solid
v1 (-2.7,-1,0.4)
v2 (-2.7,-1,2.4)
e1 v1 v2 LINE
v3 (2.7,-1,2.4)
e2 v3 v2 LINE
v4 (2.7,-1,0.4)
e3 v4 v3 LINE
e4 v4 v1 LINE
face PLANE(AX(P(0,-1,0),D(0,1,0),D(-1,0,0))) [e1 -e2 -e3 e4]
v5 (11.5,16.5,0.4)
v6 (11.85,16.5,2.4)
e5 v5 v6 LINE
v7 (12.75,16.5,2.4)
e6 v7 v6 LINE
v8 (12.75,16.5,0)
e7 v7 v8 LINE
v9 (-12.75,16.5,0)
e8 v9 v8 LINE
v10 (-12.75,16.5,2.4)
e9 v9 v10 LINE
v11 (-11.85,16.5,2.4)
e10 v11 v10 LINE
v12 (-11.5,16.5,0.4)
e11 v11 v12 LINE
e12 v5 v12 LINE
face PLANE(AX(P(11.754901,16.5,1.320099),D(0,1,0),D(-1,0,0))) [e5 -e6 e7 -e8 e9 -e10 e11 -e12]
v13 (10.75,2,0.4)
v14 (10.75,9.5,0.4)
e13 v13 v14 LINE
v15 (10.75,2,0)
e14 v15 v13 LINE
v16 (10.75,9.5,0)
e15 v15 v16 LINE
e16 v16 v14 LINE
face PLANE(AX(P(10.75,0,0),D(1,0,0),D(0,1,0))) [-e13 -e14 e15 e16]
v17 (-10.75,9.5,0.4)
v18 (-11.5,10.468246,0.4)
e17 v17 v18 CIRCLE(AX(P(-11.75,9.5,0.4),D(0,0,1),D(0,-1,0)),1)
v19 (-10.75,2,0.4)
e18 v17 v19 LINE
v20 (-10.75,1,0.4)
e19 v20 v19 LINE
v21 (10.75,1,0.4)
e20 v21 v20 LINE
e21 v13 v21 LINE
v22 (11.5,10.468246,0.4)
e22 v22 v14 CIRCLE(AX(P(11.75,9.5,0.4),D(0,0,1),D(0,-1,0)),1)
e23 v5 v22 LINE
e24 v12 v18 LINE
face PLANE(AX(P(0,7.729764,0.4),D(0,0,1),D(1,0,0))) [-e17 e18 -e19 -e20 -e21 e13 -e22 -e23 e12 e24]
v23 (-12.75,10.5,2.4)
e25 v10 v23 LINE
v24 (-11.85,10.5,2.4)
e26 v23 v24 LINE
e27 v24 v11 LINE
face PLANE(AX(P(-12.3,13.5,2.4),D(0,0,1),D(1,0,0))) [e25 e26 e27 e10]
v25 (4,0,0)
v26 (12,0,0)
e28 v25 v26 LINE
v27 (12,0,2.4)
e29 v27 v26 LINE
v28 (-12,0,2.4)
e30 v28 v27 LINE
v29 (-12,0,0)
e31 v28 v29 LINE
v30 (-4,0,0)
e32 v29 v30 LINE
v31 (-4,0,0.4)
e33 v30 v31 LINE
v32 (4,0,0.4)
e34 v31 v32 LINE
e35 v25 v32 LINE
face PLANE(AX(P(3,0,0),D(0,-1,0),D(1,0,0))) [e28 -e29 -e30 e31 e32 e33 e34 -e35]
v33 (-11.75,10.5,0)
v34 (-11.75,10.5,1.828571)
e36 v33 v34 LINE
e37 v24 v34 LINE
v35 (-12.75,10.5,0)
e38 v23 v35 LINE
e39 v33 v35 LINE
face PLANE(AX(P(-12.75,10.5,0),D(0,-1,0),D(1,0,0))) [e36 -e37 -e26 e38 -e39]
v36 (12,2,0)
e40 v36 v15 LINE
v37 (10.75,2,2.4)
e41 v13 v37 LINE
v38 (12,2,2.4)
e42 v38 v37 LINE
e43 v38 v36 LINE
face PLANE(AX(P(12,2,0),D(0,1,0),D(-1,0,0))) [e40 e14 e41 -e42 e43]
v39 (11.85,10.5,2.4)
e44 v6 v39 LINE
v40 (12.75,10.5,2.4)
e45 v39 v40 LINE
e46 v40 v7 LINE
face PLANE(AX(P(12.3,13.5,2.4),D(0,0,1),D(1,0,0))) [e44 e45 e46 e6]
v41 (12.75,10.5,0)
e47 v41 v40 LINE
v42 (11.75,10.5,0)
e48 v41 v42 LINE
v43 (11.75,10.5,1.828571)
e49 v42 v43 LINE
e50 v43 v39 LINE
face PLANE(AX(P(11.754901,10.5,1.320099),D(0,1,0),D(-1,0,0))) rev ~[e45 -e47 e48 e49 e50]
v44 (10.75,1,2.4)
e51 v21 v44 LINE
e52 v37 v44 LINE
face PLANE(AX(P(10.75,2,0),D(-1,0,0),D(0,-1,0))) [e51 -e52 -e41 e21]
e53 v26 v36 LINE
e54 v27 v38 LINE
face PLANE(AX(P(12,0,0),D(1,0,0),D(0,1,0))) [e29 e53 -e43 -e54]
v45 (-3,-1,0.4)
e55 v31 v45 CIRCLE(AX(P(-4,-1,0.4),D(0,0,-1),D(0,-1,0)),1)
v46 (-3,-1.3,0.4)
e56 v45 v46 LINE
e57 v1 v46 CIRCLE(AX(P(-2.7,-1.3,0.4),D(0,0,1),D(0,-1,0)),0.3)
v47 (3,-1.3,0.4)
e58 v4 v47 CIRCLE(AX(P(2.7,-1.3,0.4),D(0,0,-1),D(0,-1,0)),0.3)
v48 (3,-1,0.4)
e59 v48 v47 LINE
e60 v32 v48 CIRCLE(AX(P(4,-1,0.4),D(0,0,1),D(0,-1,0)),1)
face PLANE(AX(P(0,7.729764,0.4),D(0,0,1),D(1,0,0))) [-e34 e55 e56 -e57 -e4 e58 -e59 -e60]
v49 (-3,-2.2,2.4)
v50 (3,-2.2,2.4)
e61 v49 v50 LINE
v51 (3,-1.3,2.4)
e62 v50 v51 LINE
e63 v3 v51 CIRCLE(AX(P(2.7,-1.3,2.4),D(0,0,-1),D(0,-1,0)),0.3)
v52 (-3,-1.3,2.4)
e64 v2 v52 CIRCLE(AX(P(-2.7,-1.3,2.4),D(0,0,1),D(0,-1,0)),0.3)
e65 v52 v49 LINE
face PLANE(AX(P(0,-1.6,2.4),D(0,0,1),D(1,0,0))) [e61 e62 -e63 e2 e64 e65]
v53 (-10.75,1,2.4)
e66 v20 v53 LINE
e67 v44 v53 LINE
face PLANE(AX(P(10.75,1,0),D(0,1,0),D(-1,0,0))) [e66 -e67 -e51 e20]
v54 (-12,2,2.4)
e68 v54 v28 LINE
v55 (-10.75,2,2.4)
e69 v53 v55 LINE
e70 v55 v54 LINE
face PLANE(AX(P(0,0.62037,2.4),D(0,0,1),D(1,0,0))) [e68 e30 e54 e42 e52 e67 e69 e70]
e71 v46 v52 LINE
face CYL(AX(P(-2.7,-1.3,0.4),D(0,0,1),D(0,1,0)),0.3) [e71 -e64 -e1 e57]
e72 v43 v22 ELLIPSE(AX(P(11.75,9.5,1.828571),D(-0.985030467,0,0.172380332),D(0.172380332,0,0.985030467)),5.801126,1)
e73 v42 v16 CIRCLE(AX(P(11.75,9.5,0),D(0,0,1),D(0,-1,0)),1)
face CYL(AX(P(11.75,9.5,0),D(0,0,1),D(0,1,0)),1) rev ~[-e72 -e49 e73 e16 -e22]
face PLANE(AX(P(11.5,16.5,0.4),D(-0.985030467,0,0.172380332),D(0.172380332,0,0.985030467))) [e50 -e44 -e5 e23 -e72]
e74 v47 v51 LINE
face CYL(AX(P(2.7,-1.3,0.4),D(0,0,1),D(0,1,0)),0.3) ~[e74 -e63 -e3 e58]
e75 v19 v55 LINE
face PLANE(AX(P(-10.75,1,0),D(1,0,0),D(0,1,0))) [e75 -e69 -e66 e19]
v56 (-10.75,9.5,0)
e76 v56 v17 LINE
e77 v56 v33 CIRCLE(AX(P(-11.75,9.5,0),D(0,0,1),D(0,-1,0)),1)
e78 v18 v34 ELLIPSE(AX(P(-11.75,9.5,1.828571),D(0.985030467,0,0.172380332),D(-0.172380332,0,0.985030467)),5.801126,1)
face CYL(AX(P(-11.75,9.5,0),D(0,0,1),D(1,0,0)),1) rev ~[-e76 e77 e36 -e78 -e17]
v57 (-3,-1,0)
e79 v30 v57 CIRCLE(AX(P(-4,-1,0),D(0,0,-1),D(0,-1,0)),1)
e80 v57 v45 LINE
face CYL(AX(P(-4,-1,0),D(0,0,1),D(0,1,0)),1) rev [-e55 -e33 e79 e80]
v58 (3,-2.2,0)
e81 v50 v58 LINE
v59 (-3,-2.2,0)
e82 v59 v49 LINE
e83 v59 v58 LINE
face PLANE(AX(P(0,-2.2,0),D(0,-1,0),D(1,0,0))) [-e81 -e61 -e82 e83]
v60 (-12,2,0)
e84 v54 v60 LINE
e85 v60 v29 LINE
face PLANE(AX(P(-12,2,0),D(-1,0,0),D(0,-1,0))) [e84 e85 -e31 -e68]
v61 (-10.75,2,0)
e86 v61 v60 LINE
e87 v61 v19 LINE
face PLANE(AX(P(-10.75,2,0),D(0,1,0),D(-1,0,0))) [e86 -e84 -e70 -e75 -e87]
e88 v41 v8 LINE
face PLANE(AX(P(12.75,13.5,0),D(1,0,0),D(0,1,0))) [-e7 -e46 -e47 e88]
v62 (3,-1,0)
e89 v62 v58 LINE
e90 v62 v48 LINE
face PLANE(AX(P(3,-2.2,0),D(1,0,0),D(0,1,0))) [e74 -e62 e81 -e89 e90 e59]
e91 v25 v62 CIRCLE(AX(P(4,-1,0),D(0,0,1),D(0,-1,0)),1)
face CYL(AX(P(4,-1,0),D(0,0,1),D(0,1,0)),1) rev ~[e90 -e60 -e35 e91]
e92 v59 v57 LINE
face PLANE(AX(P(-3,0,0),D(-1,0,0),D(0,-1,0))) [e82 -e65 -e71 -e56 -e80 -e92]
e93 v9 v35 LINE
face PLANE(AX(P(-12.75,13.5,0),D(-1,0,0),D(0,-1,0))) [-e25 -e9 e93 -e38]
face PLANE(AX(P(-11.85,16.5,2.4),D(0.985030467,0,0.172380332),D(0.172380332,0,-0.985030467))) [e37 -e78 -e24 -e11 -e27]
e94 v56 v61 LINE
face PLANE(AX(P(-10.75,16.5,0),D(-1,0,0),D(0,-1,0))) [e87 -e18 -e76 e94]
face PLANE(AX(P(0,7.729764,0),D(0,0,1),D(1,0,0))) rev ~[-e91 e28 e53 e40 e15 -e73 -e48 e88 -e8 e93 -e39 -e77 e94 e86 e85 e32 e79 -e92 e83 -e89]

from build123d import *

# Parameters (mm, degrees)
F0_W     = 6
F0_H     = 1
F0_H_2   = 1.2
F0_W_2   = 1.1
F0_H_3   = 6
F0_W_3   = 0.9
F5_DEPTH = 6
F6_R     = 1
F7_R     = 0.3


with BuildPart() as f2:
    # F2: sweep along a path in F1
    with BuildLine(Plane.XZ) as f2_path:
        Line((0, 0), (0, 0.4))
    # F0 (on Top) → F2 (sweep)
    with BuildSketch(Plane.XY):
        Polygon((-10.75, 1), (-10.75, 0), (-3, 0), (3, 0), (10.75, 0), (10.75, 1), align=None)
        Polygon((-12, 0), (-10.75, 0), (-10.75, 1), (-10.75, 2), (-12, 2), align=None)
        with Locations((0, -0.5)):
            Rectangle(F0_W, F0_H)
        Polygon((-10.75, 2), (-10.75, 1), (10.75, 1), (10.75, 2), (10.75, 10.5), (10.75, 16.5), (-10.75, 16.5), (-10.75, 10.5), align=None)
        with Locations((0, -1.6)):
            Rectangle(F0_W, F0_H_2)
        Polygon((10.75, 2), (10.75, 1), (10.75, 0), (12, 0), (12, 2), align=None)
        with Locations((-11.3, 13.5)):
            Rectangle(F0_W_2, F0_H_3)
        with Locations((-12.3, 13.5)):
            Rectangle(F0_W_3, F0_H_3)
        with Locations((11.3, 13.5)):
            Rectangle(F0_W_2, F0_H_3)
        with Locations((12.3, 13.5)):
            Rectangle(F0_W_3, F0_H_3)
    sweep(path=f2_path.line)

    # F3: sweep along a path in F1
    with BuildLine(Plane.XZ) as f3_path:
        Line((0, 0), (0, 0.4))
        Line((0, 0.4), (0, 2.4))
    # F0 (on Top) → F3 (sweep)
    with BuildSketch(Plane.XY):
        Polygon((-10.75, 1), (-10.75, 0), (-3, 0), (3, 0), (10.75, 0), (10.75, 1), align=None)
        Polygon((-12, 0), (-10.75, 0), (-10.75, 1), (-10.75, 2), (-12, 2), align=None)
        Polygon((10.75, 2), (10.75, 1), (10.75, 0), (12, 0), (12, 2), align=None)
        with Locations((12.3, 13.5)):
            Rectangle(F0_W_3, F0_H_3)
        with Locations((-12.3, 13.5)):
            Rectangle(F0_W_3, F0_H_3)
        with Locations((0, -1.6)):
            Rectangle(F0_W, F0_H_2)
    sweep(path=f3_path.line)

    # F4 (on face) → F5 (join, through all)
    with BuildSketch(Plane(origin=(0, 16.5, 0), x_dir=(-1, 0, 0), z_dir=(0, 1, 0))):
        Polygon((-11.5, 0.4), (-11.85, 2.4), (-11.85, 0.4), align=None)
        Polygon((11.85, 2.4), (11.5, 0.4), (11.85, 0.4), align=None)
    extrude(amount=-F5_DEPTH)

    # F6
    f6_edges = [f2.edges().sort_by_distance(p)[0] for p in [
        (-10.75, 10.5, 0.2),
        (10.75, 10.5, 0.2),
        (3, 0, 0.2),
        (-3, 0, 0.2),
    ]]
    fillet(f6_edges, radius=F6_R)

    # F7
    f7_edges = [f2.edges().sort_by_distance(p)[0] for p in [
        (-3, -1, 1.4),
        (3, -1, 1.4),
    ]]
    fillet(f7_edges, radius=F7_R)


solid = f2.part
